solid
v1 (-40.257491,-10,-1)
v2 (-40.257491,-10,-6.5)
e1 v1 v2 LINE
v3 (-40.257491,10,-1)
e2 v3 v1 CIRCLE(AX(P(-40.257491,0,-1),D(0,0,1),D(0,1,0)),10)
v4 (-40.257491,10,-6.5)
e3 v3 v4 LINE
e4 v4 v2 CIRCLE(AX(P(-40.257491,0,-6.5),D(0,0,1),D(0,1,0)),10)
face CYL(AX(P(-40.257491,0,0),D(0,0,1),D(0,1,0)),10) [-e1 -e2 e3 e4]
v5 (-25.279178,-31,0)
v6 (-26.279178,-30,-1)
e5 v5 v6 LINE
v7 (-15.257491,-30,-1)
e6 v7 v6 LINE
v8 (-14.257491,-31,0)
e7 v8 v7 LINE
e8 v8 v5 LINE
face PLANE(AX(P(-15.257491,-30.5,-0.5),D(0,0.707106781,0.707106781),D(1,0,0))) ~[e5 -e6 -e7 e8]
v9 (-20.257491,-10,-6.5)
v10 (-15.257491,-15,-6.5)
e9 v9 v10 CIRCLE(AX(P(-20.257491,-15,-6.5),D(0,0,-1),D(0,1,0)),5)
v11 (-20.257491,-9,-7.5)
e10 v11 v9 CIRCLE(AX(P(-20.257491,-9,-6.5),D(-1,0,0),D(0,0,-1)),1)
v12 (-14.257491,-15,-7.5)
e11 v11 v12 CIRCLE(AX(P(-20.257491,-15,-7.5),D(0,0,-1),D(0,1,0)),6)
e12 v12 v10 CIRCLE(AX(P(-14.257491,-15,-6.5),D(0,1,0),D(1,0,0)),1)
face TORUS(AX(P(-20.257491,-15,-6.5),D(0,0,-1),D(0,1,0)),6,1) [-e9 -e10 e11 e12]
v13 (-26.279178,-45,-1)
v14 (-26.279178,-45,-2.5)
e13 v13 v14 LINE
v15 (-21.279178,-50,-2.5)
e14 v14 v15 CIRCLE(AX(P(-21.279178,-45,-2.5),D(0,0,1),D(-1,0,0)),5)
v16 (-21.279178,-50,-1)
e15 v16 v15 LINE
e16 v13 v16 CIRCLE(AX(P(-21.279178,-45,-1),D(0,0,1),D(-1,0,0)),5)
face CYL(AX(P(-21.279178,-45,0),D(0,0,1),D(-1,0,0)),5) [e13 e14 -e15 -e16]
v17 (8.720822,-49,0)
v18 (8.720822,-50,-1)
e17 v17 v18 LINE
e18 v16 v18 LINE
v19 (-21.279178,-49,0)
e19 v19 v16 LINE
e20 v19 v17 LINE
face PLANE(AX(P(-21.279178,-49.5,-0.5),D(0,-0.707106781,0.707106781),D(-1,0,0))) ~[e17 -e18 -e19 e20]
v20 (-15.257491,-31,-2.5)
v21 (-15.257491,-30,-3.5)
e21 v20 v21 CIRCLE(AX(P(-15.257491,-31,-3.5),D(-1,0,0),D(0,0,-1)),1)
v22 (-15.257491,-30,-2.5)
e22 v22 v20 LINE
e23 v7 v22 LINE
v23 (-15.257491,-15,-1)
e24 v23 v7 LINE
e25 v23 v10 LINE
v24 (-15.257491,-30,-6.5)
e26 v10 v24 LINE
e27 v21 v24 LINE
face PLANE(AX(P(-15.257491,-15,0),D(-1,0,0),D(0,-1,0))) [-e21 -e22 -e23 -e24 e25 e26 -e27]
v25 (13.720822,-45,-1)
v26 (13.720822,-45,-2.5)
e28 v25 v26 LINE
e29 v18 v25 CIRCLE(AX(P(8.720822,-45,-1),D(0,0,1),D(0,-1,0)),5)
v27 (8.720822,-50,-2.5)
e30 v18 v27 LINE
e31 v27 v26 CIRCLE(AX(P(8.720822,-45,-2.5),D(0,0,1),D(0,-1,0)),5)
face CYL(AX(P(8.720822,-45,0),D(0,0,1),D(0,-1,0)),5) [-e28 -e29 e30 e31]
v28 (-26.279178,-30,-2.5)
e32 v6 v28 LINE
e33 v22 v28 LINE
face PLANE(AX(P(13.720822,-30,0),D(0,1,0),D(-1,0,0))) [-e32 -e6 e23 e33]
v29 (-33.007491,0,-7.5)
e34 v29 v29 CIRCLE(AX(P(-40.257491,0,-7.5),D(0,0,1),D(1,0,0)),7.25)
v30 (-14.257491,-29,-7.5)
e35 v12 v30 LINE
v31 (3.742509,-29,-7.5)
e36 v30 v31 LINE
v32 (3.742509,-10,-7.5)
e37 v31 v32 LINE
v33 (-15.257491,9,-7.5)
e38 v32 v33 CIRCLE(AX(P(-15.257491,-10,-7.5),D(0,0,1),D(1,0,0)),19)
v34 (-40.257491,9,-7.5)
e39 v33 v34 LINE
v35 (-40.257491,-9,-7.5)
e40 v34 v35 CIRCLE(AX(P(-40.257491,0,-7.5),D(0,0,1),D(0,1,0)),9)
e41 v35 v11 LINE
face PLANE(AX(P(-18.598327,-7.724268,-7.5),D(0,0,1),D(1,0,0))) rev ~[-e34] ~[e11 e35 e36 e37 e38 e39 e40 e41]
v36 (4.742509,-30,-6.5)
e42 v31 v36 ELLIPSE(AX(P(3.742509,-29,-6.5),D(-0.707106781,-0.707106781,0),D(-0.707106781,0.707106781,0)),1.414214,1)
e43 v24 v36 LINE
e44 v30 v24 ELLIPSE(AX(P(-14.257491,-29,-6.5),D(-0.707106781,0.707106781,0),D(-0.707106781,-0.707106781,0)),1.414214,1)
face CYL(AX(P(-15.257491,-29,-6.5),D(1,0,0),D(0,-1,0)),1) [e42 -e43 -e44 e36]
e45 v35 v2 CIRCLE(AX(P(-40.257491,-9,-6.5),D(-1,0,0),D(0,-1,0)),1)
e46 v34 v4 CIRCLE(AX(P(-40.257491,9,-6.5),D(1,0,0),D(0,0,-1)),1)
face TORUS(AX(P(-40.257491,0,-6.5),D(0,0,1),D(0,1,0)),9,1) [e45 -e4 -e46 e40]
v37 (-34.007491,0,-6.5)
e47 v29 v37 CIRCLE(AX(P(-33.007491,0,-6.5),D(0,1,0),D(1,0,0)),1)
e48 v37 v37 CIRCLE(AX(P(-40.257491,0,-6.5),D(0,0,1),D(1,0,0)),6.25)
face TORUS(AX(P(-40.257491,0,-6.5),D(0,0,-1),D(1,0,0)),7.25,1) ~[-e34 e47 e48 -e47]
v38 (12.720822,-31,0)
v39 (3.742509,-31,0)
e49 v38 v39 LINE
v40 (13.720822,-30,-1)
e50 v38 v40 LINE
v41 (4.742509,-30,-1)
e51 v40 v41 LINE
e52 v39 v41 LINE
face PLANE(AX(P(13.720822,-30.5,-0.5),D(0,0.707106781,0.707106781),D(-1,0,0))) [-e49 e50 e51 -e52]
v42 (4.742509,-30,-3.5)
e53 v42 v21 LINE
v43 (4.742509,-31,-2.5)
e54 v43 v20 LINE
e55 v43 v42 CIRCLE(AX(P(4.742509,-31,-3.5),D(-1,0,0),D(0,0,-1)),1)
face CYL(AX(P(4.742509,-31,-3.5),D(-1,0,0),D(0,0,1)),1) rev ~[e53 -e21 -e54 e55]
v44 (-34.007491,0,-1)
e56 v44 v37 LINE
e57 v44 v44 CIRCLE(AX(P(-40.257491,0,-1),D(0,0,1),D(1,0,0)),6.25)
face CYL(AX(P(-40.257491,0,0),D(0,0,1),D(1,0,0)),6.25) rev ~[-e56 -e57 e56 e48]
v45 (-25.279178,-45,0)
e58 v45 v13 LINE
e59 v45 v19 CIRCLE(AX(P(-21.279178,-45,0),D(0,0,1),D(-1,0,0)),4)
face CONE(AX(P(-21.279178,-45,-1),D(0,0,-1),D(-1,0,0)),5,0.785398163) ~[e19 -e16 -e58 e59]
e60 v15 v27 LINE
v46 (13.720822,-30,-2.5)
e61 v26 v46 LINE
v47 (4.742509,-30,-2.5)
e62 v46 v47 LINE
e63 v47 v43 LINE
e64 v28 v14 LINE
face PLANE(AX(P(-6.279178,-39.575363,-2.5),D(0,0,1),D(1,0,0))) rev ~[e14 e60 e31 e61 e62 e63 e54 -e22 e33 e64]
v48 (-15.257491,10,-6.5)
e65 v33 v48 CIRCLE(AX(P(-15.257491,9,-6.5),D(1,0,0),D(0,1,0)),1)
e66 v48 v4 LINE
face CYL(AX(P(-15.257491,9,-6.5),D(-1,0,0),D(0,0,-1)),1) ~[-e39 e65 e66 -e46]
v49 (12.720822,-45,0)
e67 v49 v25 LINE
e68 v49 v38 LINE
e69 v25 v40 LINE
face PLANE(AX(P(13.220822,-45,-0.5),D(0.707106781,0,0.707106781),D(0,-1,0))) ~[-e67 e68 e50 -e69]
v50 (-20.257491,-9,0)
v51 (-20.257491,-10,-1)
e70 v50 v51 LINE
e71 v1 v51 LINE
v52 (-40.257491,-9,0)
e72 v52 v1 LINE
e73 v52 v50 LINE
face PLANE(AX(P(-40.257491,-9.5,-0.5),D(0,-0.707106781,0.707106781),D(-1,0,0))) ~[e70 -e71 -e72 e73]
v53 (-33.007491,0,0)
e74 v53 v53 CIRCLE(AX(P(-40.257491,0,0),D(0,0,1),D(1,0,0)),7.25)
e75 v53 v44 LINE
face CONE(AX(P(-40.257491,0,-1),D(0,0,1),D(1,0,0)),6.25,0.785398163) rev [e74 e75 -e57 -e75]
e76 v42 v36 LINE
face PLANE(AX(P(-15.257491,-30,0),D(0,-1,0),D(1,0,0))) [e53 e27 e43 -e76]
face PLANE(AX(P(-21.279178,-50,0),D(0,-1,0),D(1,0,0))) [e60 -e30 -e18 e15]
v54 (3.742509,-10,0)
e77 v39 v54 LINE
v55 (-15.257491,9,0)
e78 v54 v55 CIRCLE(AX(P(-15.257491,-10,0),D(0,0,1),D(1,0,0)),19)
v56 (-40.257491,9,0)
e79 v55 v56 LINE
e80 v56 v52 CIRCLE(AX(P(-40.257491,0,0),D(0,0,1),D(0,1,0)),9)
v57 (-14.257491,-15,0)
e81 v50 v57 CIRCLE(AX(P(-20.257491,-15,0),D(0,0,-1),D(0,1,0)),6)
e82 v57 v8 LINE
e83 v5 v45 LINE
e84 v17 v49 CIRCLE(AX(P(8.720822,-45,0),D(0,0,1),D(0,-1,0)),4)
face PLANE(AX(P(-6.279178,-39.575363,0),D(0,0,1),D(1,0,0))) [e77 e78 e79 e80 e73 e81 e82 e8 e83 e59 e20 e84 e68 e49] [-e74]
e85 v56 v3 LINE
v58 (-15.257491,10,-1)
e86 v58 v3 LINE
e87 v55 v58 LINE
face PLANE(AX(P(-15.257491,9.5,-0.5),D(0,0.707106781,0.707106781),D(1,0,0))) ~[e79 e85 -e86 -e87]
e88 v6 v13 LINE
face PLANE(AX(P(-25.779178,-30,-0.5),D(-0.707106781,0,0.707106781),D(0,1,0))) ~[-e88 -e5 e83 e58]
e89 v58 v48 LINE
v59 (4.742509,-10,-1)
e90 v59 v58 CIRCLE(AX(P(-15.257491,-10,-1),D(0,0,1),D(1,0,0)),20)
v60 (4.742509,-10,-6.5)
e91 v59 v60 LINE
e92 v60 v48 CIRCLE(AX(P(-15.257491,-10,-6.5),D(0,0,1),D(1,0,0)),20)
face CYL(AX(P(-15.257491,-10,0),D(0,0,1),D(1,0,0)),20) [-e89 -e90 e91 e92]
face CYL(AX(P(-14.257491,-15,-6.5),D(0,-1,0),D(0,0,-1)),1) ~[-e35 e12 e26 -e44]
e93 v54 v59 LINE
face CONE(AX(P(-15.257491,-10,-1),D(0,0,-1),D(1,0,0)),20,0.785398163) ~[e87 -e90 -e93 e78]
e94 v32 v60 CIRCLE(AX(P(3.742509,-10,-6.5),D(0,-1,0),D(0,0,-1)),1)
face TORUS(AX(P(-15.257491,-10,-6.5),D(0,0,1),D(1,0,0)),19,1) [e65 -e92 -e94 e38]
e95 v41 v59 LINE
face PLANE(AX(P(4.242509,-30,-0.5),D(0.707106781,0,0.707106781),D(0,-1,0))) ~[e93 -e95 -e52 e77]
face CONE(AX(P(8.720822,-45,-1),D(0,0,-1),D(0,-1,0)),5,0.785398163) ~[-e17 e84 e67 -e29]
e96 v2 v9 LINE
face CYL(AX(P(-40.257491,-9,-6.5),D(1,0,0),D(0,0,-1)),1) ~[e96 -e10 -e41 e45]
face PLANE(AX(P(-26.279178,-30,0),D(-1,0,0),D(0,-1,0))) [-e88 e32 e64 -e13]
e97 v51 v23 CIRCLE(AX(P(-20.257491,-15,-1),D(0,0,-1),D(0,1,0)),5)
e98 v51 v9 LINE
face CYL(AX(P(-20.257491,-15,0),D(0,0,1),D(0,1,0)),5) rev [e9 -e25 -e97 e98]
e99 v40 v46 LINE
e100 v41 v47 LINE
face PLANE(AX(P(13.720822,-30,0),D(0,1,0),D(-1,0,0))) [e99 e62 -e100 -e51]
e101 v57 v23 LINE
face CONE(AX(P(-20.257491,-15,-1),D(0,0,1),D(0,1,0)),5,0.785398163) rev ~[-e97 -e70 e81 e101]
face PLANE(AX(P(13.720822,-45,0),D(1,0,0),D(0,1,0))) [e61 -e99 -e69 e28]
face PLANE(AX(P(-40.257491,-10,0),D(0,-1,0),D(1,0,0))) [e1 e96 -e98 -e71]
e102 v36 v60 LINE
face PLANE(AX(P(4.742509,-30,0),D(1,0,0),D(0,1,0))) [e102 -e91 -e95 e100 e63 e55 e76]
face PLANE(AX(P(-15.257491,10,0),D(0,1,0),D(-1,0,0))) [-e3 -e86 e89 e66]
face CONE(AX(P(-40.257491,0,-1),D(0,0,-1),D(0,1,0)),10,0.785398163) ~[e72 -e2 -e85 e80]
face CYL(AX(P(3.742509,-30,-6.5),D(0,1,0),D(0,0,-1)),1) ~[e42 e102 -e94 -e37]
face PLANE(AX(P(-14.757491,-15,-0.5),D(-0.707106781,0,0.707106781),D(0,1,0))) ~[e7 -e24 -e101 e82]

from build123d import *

# Parameters (mm, degrees)
F0_R     = 6.25
F1_DEPTH = 7.5
F2_DEPTH = 2.5
F3_R     = 1
F4_SIZE  = 1


with BuildPart() as f1:
    # F0 (on Top) → F1 (new body)
    with BuildSketch(Plane.XY):
        with BuildLine():
            Line((-15.2574911714, 10), (-40.2574911714, 10))
            ThreePointArc((-40.2574911714, 10), (-50.2574911714, 0), (-40.2574911714, -10))
            Line((-40.2574911714, -10), (-20.2574911714, -10))
            ThreePointArc((-20.2574911714, -10), (-16.7219572654, -11.4644660941), (-15.2574911714, -15))
            Line((-15.2574911714, -15), (-15.2574911714, -30.0000000031))
            Line((-15.2574911714, -30.0000000031), (4.7425088286, -30.0000000031))
            Line((4.7425088286, -30.0000000031), (4.7425088286, -10))
            ThreePointArc((4.7425088286, -10), (-1.1153555476, 4.1421356237), (-15.2574911714, 10))
        make_face()
        with Locations((-40.2574911714, 0)):
            Circle(F0_R, mode=Mode.SUBTRACT)
    extrude(amount=-F1_DEPTH)

    # F0 (on Top) → F2 (join)
    with BuildSketch(Plane.XY):
        with BuildLine():
            Line((13.7208224833, -30.0000000031), (4.7425088286, -30.0000000031))
            Line((4.7425088286, -30.0000000031), (-15.2574911714, -30.0000000031))
            Line((-15.2574911714, -30.0000000031), (-26.2791775167, -30.0000000031))
            Line((-26.2791775167, -30.0000000031), (-26.2791775167, -45.0000000031))
            ThreePointArc((-26.2791775167, -45.0000000031), (-24.8147114226, -48.535533909), (-21.2791775167, -50.0000000031))
            Line((-21.2791775167, -50.0000000031), (8.7208224833, -50.0000000031))
            ThreePointArc((8.7208224833, -50.0000000031), (12.2563563892, -48.535533909), (13.7208224833, -45.0000000031))
            Line((13.7208224833, -45.0000000031), (13.7208224833, -30.0000000031))
        make_face()
    extrude(amount=-F2_DEPTH)

    # F3
    f3_edges = [f1.edges().sort_by_distance(p)[0] for p in [
        (-46.507491, 0, -7.5),
        (-27.757491, 10, -7.5),
        (-50.257491, 0, -7.5),
        (-30.257491, -10, -7.5),
        (-16.721957, -11.464466, -7.5),
        (-15.257491, -22.5, -7.5),
        (-5.257491, -30, -7.5),
        (4.742509, -20, -7.5),
        (-1.115356, 4.142136, -7.5),
        (-5.257491, -30, -2.5),
    ]]
    fillet(f3_edges, radius=F3_R)

    # F4
    f4_edges = [f1.edges().sort_by_distance(p)[0] for p in [
        (-27.757491, 10, 0),
        (-50.257491, 0, 0),
        (-30.257491, -10, 0),
        (-16.721957, -11.464466, 0),
        (-15.257491, -22.5, 0),
        (-20.768334, -30, 0),
        (-26.279178, -37.5, 0),
        (-24.814711, -48.535534, 0),
        (-6.279178, -50, 0),
        (12.256356, -48.535534, 0),
        (13.720822, -37.5, 0),
        (9.231666, -30, 0),
        (4.742509, -20, 0),
        (-1.115356, 4.142136, 0),
        (-46.507491, 0, 0),
    ]]
    chamfer(f4_edges, length=F4_SIZE)


solid = f1.part
